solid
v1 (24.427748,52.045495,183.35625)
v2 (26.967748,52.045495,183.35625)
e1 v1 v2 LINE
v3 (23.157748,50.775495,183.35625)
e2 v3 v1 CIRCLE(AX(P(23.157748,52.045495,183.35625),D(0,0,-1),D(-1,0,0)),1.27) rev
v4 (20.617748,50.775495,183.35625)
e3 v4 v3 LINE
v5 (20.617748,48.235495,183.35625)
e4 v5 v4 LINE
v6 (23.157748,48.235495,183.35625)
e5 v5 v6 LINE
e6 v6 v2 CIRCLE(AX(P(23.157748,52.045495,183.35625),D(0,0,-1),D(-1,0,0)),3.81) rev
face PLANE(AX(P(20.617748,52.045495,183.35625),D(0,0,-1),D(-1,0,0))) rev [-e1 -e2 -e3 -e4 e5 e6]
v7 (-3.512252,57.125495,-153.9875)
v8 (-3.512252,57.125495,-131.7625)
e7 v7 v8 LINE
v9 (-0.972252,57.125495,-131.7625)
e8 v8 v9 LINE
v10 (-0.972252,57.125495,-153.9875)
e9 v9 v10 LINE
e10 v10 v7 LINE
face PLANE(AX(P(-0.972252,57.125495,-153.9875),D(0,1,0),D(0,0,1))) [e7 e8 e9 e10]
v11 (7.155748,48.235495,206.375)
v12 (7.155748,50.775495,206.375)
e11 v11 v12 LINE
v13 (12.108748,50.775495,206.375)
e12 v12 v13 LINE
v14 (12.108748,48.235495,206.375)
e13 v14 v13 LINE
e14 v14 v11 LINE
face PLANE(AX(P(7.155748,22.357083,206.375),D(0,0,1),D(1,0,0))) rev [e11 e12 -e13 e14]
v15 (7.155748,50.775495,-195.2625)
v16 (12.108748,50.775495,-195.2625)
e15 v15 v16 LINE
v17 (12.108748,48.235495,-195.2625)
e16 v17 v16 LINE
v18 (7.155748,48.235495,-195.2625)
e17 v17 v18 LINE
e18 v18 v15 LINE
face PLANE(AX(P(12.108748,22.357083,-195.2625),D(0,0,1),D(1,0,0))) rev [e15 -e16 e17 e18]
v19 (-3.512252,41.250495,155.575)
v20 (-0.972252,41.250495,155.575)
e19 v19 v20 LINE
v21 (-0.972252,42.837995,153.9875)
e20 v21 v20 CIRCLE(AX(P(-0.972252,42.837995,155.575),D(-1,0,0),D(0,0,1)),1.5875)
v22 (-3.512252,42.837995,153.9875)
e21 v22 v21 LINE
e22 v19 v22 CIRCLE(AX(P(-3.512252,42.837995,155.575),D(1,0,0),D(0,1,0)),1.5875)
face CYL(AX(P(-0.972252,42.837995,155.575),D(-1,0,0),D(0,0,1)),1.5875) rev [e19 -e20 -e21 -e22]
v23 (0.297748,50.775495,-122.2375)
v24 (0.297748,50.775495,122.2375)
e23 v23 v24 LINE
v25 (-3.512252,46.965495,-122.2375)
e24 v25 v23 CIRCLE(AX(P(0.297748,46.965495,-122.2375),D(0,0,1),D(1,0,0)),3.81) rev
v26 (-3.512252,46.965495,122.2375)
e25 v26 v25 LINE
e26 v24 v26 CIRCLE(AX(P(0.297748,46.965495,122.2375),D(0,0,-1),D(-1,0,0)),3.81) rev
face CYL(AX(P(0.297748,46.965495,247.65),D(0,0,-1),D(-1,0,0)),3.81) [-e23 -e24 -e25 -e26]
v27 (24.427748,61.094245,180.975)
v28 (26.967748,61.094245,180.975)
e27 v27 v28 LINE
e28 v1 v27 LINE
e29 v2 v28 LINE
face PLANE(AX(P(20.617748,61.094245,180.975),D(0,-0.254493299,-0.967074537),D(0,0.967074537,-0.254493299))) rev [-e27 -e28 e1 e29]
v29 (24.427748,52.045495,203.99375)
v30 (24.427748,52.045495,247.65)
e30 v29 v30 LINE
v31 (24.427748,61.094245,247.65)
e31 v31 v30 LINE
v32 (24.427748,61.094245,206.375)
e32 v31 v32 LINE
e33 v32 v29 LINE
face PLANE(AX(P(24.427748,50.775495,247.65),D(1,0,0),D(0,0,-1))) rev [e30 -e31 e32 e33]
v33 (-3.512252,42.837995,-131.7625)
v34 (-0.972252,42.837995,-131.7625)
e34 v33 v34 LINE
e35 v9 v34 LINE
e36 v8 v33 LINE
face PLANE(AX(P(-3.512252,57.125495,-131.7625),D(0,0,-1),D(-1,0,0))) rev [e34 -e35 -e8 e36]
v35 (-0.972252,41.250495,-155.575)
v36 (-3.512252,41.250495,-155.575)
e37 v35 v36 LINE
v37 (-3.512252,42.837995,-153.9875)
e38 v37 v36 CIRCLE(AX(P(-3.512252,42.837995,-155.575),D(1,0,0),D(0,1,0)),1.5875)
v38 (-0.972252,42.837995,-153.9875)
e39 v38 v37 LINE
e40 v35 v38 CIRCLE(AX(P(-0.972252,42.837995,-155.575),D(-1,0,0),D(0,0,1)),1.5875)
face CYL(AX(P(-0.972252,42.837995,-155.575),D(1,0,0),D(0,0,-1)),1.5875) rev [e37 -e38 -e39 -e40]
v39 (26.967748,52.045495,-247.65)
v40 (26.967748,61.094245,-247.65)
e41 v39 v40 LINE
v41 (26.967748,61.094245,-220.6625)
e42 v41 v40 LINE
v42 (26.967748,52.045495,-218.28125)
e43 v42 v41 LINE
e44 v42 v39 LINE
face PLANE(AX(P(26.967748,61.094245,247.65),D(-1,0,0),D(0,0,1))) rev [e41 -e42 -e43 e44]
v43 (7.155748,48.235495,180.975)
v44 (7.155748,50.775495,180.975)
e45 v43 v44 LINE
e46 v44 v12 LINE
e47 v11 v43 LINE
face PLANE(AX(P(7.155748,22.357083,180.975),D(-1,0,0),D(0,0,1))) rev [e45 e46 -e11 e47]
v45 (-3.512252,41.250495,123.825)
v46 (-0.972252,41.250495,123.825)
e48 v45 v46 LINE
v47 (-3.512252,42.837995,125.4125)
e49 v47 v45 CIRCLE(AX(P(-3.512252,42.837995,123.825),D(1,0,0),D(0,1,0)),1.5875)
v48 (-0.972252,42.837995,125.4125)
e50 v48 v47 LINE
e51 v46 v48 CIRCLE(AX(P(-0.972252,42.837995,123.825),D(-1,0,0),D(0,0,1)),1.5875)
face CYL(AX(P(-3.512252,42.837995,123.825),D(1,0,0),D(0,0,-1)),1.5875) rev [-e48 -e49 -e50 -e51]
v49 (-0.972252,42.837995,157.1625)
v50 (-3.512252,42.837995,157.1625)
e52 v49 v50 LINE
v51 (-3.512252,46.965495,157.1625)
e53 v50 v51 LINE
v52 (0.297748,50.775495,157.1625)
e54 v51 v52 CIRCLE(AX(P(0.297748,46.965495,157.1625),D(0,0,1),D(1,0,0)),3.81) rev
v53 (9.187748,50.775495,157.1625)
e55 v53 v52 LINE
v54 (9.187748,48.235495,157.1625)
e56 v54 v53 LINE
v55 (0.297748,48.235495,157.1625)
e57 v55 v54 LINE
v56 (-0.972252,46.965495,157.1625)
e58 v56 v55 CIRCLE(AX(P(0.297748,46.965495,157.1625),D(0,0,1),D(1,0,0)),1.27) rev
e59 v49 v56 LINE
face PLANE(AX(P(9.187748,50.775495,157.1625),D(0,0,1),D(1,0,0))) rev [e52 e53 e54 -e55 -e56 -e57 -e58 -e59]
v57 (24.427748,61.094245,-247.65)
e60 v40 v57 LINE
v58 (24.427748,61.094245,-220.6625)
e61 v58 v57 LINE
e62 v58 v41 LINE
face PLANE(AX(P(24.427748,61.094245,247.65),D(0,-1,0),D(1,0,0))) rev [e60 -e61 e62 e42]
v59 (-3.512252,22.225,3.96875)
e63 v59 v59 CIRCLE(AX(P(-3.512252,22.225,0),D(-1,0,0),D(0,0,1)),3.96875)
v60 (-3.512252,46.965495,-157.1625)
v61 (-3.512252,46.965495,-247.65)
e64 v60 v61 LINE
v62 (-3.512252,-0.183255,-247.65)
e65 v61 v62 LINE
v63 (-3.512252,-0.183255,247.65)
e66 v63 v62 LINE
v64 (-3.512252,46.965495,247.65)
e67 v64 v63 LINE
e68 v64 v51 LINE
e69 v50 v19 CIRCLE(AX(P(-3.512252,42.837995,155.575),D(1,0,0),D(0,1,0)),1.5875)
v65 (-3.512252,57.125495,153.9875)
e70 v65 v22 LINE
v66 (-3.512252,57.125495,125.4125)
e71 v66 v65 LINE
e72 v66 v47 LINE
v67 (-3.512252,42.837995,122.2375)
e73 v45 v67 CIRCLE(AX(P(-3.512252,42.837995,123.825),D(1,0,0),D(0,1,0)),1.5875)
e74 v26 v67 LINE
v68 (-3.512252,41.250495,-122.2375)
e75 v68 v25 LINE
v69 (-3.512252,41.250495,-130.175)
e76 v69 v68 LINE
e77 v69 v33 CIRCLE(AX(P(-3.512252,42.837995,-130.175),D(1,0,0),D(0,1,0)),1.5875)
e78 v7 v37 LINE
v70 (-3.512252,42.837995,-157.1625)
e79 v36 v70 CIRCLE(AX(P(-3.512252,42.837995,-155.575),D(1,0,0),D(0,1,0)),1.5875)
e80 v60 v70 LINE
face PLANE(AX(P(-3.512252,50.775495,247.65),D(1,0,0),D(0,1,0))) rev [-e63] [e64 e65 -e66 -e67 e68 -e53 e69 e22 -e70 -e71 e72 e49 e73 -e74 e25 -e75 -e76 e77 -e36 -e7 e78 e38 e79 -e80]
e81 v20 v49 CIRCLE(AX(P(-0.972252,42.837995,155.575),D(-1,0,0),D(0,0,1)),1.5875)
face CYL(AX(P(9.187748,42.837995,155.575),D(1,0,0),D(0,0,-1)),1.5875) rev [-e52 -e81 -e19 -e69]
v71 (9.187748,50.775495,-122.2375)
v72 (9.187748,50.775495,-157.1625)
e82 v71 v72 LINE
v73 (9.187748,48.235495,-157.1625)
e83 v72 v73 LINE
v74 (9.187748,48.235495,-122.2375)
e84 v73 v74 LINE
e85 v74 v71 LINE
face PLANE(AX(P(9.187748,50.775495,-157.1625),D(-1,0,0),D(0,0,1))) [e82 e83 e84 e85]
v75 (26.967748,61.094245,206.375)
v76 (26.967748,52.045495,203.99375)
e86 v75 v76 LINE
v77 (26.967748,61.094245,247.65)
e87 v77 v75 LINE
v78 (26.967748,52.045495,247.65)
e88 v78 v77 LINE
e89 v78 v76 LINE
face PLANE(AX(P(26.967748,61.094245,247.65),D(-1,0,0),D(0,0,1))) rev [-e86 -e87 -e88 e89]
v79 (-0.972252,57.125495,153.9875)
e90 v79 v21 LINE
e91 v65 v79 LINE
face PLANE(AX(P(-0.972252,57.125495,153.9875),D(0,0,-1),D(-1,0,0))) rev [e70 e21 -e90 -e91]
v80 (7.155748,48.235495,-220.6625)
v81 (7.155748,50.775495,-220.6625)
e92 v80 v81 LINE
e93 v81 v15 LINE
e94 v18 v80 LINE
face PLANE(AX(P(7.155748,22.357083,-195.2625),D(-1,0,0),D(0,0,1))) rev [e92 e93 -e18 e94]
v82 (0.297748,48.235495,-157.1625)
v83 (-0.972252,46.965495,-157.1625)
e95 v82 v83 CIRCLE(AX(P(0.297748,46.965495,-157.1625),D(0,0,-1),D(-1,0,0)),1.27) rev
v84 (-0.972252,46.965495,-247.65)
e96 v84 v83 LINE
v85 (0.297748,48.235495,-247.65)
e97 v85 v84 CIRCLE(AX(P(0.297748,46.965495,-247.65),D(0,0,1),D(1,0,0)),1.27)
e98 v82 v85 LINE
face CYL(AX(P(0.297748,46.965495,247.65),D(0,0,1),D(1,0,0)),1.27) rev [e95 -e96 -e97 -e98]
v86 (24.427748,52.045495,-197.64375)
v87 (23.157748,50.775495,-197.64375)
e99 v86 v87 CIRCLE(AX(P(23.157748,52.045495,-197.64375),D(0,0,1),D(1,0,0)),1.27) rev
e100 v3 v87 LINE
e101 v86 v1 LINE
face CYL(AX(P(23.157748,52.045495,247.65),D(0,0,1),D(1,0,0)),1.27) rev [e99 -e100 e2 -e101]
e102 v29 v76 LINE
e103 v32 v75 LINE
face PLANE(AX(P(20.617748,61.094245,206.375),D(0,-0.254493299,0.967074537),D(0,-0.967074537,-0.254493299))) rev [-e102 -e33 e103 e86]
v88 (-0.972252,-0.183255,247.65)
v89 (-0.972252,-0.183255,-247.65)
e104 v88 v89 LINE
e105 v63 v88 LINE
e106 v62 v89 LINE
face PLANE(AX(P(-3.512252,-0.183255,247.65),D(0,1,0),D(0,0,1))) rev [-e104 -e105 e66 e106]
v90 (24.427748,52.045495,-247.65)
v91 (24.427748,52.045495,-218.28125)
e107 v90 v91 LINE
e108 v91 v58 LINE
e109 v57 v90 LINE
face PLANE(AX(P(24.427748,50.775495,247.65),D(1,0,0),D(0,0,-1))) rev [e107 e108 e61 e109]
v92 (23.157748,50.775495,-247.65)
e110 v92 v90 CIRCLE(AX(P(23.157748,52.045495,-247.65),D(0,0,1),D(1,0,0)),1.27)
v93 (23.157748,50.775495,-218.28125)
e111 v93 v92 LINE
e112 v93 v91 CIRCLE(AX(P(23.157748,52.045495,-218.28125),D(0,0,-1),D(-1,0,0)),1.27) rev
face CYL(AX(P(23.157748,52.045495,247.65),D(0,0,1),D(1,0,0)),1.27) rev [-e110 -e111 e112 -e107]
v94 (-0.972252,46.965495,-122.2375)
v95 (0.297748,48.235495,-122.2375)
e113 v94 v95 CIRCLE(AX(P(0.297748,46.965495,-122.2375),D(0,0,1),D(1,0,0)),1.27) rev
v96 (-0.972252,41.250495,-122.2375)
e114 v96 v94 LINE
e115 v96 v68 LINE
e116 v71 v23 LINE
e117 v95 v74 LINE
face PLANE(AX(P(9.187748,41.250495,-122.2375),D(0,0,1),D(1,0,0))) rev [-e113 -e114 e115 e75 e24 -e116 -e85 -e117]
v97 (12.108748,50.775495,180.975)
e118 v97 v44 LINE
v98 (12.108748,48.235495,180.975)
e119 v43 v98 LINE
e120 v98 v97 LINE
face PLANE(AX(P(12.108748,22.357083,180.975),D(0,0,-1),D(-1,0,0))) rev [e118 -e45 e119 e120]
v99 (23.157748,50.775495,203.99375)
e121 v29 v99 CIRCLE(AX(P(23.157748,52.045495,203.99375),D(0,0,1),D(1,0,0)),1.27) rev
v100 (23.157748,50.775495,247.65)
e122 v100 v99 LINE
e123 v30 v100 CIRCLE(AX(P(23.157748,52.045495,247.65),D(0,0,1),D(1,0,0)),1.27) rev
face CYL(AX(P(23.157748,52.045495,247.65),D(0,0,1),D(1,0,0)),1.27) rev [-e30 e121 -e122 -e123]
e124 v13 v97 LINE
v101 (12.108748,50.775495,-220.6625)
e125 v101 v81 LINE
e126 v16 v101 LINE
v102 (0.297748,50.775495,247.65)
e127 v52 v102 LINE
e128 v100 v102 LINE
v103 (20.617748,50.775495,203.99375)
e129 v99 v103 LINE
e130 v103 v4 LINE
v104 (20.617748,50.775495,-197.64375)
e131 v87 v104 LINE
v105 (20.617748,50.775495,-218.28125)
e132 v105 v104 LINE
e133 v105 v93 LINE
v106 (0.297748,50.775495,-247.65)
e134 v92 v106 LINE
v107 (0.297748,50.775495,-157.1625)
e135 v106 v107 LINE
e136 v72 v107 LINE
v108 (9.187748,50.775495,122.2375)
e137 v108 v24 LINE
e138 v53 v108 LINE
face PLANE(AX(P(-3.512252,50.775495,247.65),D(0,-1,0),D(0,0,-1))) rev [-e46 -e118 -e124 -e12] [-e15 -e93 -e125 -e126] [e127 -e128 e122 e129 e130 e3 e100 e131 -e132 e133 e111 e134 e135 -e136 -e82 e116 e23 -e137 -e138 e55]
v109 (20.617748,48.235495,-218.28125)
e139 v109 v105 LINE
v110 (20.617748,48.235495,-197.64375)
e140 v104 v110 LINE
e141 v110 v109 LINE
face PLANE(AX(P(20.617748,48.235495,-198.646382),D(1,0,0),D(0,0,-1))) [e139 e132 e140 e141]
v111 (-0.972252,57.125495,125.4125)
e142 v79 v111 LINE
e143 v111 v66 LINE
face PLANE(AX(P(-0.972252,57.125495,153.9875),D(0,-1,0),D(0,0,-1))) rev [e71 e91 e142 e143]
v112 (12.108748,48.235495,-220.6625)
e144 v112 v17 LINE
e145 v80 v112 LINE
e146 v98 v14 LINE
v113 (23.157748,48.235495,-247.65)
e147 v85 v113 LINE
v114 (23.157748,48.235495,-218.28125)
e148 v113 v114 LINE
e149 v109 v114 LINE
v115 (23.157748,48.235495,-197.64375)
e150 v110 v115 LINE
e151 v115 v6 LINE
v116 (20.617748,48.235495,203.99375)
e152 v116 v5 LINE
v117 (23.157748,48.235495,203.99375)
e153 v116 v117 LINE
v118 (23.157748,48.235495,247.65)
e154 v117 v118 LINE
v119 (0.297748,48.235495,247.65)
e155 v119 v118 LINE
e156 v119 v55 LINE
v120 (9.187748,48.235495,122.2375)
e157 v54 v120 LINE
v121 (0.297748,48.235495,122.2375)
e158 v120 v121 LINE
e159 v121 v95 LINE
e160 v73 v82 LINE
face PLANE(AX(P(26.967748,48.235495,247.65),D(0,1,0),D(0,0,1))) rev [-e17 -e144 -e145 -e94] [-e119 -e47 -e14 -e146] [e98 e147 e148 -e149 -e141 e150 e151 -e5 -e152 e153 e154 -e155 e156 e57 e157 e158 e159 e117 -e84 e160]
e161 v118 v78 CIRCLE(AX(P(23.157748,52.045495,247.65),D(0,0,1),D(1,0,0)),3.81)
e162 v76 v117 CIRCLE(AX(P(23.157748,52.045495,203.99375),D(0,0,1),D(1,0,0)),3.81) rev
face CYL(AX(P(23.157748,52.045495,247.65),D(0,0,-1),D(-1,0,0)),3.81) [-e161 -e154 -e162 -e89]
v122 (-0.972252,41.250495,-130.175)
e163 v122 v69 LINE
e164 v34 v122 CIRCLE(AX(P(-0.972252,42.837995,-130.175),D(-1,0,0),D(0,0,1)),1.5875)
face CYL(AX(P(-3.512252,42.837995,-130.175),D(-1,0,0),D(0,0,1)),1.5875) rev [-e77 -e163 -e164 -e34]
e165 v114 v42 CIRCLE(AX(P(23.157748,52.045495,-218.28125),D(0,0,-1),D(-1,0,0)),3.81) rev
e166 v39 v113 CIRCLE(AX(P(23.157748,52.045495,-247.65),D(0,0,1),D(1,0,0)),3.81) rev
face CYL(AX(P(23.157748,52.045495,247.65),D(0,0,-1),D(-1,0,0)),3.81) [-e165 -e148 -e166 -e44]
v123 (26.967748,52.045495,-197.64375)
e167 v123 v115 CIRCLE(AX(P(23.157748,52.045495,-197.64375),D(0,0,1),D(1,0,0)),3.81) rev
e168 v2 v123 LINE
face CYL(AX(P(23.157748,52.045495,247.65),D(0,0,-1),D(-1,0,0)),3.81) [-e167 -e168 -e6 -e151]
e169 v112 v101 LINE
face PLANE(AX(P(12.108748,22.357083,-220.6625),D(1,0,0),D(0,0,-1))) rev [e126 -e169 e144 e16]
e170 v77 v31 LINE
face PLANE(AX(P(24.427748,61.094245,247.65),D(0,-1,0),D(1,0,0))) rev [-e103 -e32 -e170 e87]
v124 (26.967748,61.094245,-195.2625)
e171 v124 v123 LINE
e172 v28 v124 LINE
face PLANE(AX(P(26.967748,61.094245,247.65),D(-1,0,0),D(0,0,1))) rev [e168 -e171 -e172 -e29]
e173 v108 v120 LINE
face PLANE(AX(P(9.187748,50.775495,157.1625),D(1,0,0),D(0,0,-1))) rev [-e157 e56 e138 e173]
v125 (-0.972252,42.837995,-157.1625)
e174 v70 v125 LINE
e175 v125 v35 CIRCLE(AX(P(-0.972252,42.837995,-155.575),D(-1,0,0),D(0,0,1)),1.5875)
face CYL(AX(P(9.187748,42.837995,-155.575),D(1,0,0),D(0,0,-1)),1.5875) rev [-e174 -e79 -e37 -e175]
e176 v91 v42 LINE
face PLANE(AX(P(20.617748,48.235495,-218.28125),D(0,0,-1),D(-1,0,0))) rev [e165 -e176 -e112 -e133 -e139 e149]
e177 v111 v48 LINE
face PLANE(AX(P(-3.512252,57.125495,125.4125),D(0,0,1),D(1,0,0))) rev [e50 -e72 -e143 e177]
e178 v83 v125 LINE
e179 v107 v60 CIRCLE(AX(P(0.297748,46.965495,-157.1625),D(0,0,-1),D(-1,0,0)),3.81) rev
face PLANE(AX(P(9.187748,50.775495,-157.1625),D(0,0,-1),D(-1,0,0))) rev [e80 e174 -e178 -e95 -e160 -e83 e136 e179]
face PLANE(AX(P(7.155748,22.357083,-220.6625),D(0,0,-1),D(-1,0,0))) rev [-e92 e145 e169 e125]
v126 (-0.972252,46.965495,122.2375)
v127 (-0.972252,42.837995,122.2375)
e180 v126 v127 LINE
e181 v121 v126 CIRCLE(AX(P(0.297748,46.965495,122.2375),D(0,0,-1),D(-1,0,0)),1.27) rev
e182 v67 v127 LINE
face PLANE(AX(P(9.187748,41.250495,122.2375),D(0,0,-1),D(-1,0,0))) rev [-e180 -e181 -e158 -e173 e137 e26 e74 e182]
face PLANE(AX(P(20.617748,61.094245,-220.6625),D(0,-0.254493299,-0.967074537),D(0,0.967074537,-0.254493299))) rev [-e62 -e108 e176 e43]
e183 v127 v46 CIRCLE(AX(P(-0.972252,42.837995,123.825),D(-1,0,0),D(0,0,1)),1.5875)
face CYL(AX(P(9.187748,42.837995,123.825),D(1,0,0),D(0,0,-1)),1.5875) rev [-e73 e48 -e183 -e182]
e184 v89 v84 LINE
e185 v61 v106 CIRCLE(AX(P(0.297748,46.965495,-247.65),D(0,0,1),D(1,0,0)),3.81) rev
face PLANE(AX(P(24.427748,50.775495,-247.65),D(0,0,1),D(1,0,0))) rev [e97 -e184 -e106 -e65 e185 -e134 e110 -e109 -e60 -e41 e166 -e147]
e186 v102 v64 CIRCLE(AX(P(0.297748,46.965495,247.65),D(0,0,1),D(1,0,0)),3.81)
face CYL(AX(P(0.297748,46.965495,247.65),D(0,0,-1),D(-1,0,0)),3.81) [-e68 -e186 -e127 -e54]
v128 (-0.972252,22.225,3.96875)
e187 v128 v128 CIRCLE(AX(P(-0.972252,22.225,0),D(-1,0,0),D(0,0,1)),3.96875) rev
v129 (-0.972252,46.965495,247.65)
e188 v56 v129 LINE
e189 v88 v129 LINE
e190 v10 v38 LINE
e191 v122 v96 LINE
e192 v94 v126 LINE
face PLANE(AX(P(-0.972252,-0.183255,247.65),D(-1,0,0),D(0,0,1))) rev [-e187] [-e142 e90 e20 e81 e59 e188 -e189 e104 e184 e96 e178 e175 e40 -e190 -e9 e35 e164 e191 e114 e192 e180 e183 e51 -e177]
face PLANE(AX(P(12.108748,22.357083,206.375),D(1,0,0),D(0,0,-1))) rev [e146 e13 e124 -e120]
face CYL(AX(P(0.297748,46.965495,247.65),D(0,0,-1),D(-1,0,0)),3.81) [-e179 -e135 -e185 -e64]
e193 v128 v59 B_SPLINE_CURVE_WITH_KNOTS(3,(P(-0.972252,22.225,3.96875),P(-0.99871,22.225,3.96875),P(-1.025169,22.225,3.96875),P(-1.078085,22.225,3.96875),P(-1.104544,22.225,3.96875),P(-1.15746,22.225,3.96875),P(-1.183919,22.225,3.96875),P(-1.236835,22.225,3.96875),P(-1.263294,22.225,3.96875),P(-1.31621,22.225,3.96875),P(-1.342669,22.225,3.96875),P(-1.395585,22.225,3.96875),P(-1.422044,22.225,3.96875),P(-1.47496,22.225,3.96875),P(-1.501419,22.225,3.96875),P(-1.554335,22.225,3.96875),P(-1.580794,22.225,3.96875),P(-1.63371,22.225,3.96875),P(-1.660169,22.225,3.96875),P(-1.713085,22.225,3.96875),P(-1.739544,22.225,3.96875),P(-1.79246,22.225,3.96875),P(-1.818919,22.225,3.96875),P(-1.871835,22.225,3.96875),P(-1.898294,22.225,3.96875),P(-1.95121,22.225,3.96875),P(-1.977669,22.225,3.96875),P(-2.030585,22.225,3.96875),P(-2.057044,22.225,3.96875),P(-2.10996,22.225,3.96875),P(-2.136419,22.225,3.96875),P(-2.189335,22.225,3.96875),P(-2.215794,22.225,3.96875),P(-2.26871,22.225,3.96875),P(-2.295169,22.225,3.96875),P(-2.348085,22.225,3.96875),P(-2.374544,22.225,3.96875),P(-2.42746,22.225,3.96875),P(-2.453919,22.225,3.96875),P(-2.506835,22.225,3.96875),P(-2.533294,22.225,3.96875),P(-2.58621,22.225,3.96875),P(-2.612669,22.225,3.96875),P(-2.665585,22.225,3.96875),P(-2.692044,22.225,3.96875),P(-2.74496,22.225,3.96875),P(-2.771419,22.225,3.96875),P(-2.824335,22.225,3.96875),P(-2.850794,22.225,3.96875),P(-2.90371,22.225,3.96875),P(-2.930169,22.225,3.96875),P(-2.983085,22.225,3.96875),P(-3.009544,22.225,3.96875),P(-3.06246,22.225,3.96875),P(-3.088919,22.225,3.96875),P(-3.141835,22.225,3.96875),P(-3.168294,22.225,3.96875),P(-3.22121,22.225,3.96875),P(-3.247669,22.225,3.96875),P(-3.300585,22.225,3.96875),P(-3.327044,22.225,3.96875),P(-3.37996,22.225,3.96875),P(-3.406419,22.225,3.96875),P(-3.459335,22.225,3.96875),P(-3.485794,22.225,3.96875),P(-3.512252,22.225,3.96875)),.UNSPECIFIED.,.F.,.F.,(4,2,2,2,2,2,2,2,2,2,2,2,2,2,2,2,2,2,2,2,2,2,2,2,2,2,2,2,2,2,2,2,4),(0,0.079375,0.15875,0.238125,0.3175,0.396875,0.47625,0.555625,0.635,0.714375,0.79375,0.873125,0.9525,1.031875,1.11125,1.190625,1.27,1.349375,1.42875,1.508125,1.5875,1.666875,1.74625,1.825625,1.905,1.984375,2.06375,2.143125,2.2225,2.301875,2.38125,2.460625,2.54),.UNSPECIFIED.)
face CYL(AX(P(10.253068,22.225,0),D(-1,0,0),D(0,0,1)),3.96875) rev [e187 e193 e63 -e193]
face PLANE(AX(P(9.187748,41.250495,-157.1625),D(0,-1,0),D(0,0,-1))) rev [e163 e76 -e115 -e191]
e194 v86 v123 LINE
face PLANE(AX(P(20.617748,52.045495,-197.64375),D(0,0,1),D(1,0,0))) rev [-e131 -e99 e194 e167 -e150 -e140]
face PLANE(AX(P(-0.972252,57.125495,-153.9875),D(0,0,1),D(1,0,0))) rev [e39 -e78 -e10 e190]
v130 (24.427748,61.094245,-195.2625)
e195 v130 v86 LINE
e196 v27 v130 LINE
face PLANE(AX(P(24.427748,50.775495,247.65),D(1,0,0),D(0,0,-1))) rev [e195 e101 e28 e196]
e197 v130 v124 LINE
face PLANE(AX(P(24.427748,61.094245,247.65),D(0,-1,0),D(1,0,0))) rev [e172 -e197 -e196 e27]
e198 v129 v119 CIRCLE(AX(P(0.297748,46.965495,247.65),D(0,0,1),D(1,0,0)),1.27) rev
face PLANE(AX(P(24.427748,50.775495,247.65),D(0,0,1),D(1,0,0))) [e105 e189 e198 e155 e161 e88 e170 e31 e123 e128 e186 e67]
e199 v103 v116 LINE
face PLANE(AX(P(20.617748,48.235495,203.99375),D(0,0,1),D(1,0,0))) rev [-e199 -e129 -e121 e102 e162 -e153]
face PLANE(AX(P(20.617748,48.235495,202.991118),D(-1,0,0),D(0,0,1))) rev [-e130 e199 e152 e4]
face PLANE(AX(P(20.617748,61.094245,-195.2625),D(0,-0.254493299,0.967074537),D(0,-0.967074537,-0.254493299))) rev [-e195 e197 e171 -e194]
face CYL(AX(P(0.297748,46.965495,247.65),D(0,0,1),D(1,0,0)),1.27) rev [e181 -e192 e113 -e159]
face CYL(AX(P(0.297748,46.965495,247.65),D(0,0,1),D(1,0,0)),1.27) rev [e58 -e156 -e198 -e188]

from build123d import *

# Parameters (mm, degrees)
EXTRUDE1_DEPTH     = 247.65
FILLET2_R          = 1.27
FILLET3_R          = 3.81
SKETCH2_W          = 34.925
SKETCH2_H          = 9.525
CUT_EXTRUDE1_DEPTH = 12.7
SKETCH3_W          = 2.54
SKETCH3_H          = 22.225
SKETCH3_H_2        = 28.575
EXTRUDE2_DEPTH     = 15.875
FILLET1_R          = 1.5875
SKETCH4_W          = 4.953
SKETCH4_H          = 25.4
CUT_EXTRUDE2_DEPTH = 2.54
CUT_EXTRUDE3_DEPTH = 6.35
SKETCH6_R          = 3.96875
CUT_EXTRUDE4_DEPTH = 2.54


with BuildPart() as part:
    # Sketch1 → Extrude1 (new, symmetric)
    with BuildSketch(Plane.XY):
        Polygon((-3.512251891, 50.775495097), (-3.512251891, -0.183254903), (-0.972251891, -0.183254903), (-0.972251891, 48.235495097), (26.967748109, 48.235495097), (26.967748109, 61.094245097), (24.427748109, 61.094245097), (24.427748109, 50.775495097), align=None)
    extrude(amount=EXTRUDE1_DEPTH, both=True)

    # Fillet2
    fillet2_edges = [part.edges().sort_by_distance(p)[0] for p in [
        (24.427748109, 50.775495097, 0),
        (-0.972251891, 48.235495097, 0),
    ]]
    fillet(fillet2_edges, radius=FILLET2_R)

    # Fillet3
    fillet3_edges = [part.edges().sort_by_distance(p)[0] for p in [
        (26.967748109, 48.235495097, 0),
        (-3.512251891, 50.775495097, 0),
    ]]
    fillet(fillet3_edges, radius=FILLET3_R)

    # Sketch2 → Cut-Extrude1 (cut)
    with BuildSketch(Plane.ZY.offset(3.512251891)):
        with Locations((-139.7, 46.012995097)):
            Rectangle(SKETCH2_W, SKETCH2_H)
        with Locations((139.7, 46.012995097)):
            Rectangle(SKETCH2_W, SKETCH2_H)
    extrude(amount=-CUT_EXTRUDE1_DEPTH, mode=Mode.SUBTRACT)

    # Sketch3 → Extrude2 (add)
    with BuildSketch(Plane(origin=(0, 41.250495097, 0), x_dir=(1, 0, 0), z_dir=(0, 1, 0))):
        with Locations((-2.242251891, 142.875)):
            Rectangle(SKETCH3_W, SKETCH3_H)
        with Locations((-2.242251891, -139.7)):
            Rectangle(SKETCH3_W, SKETCH3_H_2)
    extrude(amount=EXTRUDE2_DEPTH)

    # Fillet1
    fillet1_edges = [part.edges().sort_by_distance(p)[0] for p in [
        (-2.242251891, 41.250495097, -153.9875),
        (-2.242251891, 41.250495097, -131.7625),
        (-2.242251891, 41.250495097, 125.4125),
        (-2.242251891, 41.250495097, 153.9875),
        (-2.242251891, 41.250495097, -157.1625),
        (-2.242251891, 41.250495097, 157.1625),
        (-2.242251891, 41.250495097, 122.2375),
    ]]
    fillet(fillet1_edges, radius=FILLET1_R - 0.0001)  # a hair under: the kernel refuses the full size

    # Sketch4 → Cut-Extrude2 (cut)
    with BuildSketch(Plane(origin=(0, 50.775495097, 0), x_dir=(1, 0, 0), z_dir=(0, 1, 0))):
        with Locations((9.632248109, 207.9625)):
            Rectangle(SKETCH4_W, SKETCH4_H)
        with Locations((9.632248109, -193.675)):
            Rectangle(SKETCH4_W, SKETCH4_H)
    extrude(amount=-CUT_EXTRUDE2_DEPTH, mode=Mode.SUBTRACT)

    # Sketch5 → Cut-Extrude3 (cut)
    with BuildSketch(Plane(origin=(26.967748109, 0, 0), x_dir=(0, 0, -1), z_dir=(1, 0, 0))):
        Polygon((195.2625, 61.094245097), (220.6625, 61.094245097), (218.28125, 52.045495097), (218.28125, 48.235495097), (197.64375, 48.235495097), (197.64375, 52.045495097), align=None)
        Polygon((-180.975, 61.094245097), (-206.375, 61.094245097), (-203.99375, 52.045495097), (-203.99375, 48.235495097), (-183.35625, 48.235495097), (-183.35625, 52.045495097), align=None)
    extrude(amount=-CUT_EXTRUDE3_DEPTH, mode=Mode.SUBTRACT)

    # Sketch6 → Cut-Extrude4 (cut)
    with BuildSketch(Plane.ZY.offset(3.512251891)):
        with Locations((0, 22.225)):
            Circle(SKETCH6_R)
    extrude(amount=-CUT_EXTRUDE4_DEPTH, mode=Mode.SUBTRACT)


solid = part.part
